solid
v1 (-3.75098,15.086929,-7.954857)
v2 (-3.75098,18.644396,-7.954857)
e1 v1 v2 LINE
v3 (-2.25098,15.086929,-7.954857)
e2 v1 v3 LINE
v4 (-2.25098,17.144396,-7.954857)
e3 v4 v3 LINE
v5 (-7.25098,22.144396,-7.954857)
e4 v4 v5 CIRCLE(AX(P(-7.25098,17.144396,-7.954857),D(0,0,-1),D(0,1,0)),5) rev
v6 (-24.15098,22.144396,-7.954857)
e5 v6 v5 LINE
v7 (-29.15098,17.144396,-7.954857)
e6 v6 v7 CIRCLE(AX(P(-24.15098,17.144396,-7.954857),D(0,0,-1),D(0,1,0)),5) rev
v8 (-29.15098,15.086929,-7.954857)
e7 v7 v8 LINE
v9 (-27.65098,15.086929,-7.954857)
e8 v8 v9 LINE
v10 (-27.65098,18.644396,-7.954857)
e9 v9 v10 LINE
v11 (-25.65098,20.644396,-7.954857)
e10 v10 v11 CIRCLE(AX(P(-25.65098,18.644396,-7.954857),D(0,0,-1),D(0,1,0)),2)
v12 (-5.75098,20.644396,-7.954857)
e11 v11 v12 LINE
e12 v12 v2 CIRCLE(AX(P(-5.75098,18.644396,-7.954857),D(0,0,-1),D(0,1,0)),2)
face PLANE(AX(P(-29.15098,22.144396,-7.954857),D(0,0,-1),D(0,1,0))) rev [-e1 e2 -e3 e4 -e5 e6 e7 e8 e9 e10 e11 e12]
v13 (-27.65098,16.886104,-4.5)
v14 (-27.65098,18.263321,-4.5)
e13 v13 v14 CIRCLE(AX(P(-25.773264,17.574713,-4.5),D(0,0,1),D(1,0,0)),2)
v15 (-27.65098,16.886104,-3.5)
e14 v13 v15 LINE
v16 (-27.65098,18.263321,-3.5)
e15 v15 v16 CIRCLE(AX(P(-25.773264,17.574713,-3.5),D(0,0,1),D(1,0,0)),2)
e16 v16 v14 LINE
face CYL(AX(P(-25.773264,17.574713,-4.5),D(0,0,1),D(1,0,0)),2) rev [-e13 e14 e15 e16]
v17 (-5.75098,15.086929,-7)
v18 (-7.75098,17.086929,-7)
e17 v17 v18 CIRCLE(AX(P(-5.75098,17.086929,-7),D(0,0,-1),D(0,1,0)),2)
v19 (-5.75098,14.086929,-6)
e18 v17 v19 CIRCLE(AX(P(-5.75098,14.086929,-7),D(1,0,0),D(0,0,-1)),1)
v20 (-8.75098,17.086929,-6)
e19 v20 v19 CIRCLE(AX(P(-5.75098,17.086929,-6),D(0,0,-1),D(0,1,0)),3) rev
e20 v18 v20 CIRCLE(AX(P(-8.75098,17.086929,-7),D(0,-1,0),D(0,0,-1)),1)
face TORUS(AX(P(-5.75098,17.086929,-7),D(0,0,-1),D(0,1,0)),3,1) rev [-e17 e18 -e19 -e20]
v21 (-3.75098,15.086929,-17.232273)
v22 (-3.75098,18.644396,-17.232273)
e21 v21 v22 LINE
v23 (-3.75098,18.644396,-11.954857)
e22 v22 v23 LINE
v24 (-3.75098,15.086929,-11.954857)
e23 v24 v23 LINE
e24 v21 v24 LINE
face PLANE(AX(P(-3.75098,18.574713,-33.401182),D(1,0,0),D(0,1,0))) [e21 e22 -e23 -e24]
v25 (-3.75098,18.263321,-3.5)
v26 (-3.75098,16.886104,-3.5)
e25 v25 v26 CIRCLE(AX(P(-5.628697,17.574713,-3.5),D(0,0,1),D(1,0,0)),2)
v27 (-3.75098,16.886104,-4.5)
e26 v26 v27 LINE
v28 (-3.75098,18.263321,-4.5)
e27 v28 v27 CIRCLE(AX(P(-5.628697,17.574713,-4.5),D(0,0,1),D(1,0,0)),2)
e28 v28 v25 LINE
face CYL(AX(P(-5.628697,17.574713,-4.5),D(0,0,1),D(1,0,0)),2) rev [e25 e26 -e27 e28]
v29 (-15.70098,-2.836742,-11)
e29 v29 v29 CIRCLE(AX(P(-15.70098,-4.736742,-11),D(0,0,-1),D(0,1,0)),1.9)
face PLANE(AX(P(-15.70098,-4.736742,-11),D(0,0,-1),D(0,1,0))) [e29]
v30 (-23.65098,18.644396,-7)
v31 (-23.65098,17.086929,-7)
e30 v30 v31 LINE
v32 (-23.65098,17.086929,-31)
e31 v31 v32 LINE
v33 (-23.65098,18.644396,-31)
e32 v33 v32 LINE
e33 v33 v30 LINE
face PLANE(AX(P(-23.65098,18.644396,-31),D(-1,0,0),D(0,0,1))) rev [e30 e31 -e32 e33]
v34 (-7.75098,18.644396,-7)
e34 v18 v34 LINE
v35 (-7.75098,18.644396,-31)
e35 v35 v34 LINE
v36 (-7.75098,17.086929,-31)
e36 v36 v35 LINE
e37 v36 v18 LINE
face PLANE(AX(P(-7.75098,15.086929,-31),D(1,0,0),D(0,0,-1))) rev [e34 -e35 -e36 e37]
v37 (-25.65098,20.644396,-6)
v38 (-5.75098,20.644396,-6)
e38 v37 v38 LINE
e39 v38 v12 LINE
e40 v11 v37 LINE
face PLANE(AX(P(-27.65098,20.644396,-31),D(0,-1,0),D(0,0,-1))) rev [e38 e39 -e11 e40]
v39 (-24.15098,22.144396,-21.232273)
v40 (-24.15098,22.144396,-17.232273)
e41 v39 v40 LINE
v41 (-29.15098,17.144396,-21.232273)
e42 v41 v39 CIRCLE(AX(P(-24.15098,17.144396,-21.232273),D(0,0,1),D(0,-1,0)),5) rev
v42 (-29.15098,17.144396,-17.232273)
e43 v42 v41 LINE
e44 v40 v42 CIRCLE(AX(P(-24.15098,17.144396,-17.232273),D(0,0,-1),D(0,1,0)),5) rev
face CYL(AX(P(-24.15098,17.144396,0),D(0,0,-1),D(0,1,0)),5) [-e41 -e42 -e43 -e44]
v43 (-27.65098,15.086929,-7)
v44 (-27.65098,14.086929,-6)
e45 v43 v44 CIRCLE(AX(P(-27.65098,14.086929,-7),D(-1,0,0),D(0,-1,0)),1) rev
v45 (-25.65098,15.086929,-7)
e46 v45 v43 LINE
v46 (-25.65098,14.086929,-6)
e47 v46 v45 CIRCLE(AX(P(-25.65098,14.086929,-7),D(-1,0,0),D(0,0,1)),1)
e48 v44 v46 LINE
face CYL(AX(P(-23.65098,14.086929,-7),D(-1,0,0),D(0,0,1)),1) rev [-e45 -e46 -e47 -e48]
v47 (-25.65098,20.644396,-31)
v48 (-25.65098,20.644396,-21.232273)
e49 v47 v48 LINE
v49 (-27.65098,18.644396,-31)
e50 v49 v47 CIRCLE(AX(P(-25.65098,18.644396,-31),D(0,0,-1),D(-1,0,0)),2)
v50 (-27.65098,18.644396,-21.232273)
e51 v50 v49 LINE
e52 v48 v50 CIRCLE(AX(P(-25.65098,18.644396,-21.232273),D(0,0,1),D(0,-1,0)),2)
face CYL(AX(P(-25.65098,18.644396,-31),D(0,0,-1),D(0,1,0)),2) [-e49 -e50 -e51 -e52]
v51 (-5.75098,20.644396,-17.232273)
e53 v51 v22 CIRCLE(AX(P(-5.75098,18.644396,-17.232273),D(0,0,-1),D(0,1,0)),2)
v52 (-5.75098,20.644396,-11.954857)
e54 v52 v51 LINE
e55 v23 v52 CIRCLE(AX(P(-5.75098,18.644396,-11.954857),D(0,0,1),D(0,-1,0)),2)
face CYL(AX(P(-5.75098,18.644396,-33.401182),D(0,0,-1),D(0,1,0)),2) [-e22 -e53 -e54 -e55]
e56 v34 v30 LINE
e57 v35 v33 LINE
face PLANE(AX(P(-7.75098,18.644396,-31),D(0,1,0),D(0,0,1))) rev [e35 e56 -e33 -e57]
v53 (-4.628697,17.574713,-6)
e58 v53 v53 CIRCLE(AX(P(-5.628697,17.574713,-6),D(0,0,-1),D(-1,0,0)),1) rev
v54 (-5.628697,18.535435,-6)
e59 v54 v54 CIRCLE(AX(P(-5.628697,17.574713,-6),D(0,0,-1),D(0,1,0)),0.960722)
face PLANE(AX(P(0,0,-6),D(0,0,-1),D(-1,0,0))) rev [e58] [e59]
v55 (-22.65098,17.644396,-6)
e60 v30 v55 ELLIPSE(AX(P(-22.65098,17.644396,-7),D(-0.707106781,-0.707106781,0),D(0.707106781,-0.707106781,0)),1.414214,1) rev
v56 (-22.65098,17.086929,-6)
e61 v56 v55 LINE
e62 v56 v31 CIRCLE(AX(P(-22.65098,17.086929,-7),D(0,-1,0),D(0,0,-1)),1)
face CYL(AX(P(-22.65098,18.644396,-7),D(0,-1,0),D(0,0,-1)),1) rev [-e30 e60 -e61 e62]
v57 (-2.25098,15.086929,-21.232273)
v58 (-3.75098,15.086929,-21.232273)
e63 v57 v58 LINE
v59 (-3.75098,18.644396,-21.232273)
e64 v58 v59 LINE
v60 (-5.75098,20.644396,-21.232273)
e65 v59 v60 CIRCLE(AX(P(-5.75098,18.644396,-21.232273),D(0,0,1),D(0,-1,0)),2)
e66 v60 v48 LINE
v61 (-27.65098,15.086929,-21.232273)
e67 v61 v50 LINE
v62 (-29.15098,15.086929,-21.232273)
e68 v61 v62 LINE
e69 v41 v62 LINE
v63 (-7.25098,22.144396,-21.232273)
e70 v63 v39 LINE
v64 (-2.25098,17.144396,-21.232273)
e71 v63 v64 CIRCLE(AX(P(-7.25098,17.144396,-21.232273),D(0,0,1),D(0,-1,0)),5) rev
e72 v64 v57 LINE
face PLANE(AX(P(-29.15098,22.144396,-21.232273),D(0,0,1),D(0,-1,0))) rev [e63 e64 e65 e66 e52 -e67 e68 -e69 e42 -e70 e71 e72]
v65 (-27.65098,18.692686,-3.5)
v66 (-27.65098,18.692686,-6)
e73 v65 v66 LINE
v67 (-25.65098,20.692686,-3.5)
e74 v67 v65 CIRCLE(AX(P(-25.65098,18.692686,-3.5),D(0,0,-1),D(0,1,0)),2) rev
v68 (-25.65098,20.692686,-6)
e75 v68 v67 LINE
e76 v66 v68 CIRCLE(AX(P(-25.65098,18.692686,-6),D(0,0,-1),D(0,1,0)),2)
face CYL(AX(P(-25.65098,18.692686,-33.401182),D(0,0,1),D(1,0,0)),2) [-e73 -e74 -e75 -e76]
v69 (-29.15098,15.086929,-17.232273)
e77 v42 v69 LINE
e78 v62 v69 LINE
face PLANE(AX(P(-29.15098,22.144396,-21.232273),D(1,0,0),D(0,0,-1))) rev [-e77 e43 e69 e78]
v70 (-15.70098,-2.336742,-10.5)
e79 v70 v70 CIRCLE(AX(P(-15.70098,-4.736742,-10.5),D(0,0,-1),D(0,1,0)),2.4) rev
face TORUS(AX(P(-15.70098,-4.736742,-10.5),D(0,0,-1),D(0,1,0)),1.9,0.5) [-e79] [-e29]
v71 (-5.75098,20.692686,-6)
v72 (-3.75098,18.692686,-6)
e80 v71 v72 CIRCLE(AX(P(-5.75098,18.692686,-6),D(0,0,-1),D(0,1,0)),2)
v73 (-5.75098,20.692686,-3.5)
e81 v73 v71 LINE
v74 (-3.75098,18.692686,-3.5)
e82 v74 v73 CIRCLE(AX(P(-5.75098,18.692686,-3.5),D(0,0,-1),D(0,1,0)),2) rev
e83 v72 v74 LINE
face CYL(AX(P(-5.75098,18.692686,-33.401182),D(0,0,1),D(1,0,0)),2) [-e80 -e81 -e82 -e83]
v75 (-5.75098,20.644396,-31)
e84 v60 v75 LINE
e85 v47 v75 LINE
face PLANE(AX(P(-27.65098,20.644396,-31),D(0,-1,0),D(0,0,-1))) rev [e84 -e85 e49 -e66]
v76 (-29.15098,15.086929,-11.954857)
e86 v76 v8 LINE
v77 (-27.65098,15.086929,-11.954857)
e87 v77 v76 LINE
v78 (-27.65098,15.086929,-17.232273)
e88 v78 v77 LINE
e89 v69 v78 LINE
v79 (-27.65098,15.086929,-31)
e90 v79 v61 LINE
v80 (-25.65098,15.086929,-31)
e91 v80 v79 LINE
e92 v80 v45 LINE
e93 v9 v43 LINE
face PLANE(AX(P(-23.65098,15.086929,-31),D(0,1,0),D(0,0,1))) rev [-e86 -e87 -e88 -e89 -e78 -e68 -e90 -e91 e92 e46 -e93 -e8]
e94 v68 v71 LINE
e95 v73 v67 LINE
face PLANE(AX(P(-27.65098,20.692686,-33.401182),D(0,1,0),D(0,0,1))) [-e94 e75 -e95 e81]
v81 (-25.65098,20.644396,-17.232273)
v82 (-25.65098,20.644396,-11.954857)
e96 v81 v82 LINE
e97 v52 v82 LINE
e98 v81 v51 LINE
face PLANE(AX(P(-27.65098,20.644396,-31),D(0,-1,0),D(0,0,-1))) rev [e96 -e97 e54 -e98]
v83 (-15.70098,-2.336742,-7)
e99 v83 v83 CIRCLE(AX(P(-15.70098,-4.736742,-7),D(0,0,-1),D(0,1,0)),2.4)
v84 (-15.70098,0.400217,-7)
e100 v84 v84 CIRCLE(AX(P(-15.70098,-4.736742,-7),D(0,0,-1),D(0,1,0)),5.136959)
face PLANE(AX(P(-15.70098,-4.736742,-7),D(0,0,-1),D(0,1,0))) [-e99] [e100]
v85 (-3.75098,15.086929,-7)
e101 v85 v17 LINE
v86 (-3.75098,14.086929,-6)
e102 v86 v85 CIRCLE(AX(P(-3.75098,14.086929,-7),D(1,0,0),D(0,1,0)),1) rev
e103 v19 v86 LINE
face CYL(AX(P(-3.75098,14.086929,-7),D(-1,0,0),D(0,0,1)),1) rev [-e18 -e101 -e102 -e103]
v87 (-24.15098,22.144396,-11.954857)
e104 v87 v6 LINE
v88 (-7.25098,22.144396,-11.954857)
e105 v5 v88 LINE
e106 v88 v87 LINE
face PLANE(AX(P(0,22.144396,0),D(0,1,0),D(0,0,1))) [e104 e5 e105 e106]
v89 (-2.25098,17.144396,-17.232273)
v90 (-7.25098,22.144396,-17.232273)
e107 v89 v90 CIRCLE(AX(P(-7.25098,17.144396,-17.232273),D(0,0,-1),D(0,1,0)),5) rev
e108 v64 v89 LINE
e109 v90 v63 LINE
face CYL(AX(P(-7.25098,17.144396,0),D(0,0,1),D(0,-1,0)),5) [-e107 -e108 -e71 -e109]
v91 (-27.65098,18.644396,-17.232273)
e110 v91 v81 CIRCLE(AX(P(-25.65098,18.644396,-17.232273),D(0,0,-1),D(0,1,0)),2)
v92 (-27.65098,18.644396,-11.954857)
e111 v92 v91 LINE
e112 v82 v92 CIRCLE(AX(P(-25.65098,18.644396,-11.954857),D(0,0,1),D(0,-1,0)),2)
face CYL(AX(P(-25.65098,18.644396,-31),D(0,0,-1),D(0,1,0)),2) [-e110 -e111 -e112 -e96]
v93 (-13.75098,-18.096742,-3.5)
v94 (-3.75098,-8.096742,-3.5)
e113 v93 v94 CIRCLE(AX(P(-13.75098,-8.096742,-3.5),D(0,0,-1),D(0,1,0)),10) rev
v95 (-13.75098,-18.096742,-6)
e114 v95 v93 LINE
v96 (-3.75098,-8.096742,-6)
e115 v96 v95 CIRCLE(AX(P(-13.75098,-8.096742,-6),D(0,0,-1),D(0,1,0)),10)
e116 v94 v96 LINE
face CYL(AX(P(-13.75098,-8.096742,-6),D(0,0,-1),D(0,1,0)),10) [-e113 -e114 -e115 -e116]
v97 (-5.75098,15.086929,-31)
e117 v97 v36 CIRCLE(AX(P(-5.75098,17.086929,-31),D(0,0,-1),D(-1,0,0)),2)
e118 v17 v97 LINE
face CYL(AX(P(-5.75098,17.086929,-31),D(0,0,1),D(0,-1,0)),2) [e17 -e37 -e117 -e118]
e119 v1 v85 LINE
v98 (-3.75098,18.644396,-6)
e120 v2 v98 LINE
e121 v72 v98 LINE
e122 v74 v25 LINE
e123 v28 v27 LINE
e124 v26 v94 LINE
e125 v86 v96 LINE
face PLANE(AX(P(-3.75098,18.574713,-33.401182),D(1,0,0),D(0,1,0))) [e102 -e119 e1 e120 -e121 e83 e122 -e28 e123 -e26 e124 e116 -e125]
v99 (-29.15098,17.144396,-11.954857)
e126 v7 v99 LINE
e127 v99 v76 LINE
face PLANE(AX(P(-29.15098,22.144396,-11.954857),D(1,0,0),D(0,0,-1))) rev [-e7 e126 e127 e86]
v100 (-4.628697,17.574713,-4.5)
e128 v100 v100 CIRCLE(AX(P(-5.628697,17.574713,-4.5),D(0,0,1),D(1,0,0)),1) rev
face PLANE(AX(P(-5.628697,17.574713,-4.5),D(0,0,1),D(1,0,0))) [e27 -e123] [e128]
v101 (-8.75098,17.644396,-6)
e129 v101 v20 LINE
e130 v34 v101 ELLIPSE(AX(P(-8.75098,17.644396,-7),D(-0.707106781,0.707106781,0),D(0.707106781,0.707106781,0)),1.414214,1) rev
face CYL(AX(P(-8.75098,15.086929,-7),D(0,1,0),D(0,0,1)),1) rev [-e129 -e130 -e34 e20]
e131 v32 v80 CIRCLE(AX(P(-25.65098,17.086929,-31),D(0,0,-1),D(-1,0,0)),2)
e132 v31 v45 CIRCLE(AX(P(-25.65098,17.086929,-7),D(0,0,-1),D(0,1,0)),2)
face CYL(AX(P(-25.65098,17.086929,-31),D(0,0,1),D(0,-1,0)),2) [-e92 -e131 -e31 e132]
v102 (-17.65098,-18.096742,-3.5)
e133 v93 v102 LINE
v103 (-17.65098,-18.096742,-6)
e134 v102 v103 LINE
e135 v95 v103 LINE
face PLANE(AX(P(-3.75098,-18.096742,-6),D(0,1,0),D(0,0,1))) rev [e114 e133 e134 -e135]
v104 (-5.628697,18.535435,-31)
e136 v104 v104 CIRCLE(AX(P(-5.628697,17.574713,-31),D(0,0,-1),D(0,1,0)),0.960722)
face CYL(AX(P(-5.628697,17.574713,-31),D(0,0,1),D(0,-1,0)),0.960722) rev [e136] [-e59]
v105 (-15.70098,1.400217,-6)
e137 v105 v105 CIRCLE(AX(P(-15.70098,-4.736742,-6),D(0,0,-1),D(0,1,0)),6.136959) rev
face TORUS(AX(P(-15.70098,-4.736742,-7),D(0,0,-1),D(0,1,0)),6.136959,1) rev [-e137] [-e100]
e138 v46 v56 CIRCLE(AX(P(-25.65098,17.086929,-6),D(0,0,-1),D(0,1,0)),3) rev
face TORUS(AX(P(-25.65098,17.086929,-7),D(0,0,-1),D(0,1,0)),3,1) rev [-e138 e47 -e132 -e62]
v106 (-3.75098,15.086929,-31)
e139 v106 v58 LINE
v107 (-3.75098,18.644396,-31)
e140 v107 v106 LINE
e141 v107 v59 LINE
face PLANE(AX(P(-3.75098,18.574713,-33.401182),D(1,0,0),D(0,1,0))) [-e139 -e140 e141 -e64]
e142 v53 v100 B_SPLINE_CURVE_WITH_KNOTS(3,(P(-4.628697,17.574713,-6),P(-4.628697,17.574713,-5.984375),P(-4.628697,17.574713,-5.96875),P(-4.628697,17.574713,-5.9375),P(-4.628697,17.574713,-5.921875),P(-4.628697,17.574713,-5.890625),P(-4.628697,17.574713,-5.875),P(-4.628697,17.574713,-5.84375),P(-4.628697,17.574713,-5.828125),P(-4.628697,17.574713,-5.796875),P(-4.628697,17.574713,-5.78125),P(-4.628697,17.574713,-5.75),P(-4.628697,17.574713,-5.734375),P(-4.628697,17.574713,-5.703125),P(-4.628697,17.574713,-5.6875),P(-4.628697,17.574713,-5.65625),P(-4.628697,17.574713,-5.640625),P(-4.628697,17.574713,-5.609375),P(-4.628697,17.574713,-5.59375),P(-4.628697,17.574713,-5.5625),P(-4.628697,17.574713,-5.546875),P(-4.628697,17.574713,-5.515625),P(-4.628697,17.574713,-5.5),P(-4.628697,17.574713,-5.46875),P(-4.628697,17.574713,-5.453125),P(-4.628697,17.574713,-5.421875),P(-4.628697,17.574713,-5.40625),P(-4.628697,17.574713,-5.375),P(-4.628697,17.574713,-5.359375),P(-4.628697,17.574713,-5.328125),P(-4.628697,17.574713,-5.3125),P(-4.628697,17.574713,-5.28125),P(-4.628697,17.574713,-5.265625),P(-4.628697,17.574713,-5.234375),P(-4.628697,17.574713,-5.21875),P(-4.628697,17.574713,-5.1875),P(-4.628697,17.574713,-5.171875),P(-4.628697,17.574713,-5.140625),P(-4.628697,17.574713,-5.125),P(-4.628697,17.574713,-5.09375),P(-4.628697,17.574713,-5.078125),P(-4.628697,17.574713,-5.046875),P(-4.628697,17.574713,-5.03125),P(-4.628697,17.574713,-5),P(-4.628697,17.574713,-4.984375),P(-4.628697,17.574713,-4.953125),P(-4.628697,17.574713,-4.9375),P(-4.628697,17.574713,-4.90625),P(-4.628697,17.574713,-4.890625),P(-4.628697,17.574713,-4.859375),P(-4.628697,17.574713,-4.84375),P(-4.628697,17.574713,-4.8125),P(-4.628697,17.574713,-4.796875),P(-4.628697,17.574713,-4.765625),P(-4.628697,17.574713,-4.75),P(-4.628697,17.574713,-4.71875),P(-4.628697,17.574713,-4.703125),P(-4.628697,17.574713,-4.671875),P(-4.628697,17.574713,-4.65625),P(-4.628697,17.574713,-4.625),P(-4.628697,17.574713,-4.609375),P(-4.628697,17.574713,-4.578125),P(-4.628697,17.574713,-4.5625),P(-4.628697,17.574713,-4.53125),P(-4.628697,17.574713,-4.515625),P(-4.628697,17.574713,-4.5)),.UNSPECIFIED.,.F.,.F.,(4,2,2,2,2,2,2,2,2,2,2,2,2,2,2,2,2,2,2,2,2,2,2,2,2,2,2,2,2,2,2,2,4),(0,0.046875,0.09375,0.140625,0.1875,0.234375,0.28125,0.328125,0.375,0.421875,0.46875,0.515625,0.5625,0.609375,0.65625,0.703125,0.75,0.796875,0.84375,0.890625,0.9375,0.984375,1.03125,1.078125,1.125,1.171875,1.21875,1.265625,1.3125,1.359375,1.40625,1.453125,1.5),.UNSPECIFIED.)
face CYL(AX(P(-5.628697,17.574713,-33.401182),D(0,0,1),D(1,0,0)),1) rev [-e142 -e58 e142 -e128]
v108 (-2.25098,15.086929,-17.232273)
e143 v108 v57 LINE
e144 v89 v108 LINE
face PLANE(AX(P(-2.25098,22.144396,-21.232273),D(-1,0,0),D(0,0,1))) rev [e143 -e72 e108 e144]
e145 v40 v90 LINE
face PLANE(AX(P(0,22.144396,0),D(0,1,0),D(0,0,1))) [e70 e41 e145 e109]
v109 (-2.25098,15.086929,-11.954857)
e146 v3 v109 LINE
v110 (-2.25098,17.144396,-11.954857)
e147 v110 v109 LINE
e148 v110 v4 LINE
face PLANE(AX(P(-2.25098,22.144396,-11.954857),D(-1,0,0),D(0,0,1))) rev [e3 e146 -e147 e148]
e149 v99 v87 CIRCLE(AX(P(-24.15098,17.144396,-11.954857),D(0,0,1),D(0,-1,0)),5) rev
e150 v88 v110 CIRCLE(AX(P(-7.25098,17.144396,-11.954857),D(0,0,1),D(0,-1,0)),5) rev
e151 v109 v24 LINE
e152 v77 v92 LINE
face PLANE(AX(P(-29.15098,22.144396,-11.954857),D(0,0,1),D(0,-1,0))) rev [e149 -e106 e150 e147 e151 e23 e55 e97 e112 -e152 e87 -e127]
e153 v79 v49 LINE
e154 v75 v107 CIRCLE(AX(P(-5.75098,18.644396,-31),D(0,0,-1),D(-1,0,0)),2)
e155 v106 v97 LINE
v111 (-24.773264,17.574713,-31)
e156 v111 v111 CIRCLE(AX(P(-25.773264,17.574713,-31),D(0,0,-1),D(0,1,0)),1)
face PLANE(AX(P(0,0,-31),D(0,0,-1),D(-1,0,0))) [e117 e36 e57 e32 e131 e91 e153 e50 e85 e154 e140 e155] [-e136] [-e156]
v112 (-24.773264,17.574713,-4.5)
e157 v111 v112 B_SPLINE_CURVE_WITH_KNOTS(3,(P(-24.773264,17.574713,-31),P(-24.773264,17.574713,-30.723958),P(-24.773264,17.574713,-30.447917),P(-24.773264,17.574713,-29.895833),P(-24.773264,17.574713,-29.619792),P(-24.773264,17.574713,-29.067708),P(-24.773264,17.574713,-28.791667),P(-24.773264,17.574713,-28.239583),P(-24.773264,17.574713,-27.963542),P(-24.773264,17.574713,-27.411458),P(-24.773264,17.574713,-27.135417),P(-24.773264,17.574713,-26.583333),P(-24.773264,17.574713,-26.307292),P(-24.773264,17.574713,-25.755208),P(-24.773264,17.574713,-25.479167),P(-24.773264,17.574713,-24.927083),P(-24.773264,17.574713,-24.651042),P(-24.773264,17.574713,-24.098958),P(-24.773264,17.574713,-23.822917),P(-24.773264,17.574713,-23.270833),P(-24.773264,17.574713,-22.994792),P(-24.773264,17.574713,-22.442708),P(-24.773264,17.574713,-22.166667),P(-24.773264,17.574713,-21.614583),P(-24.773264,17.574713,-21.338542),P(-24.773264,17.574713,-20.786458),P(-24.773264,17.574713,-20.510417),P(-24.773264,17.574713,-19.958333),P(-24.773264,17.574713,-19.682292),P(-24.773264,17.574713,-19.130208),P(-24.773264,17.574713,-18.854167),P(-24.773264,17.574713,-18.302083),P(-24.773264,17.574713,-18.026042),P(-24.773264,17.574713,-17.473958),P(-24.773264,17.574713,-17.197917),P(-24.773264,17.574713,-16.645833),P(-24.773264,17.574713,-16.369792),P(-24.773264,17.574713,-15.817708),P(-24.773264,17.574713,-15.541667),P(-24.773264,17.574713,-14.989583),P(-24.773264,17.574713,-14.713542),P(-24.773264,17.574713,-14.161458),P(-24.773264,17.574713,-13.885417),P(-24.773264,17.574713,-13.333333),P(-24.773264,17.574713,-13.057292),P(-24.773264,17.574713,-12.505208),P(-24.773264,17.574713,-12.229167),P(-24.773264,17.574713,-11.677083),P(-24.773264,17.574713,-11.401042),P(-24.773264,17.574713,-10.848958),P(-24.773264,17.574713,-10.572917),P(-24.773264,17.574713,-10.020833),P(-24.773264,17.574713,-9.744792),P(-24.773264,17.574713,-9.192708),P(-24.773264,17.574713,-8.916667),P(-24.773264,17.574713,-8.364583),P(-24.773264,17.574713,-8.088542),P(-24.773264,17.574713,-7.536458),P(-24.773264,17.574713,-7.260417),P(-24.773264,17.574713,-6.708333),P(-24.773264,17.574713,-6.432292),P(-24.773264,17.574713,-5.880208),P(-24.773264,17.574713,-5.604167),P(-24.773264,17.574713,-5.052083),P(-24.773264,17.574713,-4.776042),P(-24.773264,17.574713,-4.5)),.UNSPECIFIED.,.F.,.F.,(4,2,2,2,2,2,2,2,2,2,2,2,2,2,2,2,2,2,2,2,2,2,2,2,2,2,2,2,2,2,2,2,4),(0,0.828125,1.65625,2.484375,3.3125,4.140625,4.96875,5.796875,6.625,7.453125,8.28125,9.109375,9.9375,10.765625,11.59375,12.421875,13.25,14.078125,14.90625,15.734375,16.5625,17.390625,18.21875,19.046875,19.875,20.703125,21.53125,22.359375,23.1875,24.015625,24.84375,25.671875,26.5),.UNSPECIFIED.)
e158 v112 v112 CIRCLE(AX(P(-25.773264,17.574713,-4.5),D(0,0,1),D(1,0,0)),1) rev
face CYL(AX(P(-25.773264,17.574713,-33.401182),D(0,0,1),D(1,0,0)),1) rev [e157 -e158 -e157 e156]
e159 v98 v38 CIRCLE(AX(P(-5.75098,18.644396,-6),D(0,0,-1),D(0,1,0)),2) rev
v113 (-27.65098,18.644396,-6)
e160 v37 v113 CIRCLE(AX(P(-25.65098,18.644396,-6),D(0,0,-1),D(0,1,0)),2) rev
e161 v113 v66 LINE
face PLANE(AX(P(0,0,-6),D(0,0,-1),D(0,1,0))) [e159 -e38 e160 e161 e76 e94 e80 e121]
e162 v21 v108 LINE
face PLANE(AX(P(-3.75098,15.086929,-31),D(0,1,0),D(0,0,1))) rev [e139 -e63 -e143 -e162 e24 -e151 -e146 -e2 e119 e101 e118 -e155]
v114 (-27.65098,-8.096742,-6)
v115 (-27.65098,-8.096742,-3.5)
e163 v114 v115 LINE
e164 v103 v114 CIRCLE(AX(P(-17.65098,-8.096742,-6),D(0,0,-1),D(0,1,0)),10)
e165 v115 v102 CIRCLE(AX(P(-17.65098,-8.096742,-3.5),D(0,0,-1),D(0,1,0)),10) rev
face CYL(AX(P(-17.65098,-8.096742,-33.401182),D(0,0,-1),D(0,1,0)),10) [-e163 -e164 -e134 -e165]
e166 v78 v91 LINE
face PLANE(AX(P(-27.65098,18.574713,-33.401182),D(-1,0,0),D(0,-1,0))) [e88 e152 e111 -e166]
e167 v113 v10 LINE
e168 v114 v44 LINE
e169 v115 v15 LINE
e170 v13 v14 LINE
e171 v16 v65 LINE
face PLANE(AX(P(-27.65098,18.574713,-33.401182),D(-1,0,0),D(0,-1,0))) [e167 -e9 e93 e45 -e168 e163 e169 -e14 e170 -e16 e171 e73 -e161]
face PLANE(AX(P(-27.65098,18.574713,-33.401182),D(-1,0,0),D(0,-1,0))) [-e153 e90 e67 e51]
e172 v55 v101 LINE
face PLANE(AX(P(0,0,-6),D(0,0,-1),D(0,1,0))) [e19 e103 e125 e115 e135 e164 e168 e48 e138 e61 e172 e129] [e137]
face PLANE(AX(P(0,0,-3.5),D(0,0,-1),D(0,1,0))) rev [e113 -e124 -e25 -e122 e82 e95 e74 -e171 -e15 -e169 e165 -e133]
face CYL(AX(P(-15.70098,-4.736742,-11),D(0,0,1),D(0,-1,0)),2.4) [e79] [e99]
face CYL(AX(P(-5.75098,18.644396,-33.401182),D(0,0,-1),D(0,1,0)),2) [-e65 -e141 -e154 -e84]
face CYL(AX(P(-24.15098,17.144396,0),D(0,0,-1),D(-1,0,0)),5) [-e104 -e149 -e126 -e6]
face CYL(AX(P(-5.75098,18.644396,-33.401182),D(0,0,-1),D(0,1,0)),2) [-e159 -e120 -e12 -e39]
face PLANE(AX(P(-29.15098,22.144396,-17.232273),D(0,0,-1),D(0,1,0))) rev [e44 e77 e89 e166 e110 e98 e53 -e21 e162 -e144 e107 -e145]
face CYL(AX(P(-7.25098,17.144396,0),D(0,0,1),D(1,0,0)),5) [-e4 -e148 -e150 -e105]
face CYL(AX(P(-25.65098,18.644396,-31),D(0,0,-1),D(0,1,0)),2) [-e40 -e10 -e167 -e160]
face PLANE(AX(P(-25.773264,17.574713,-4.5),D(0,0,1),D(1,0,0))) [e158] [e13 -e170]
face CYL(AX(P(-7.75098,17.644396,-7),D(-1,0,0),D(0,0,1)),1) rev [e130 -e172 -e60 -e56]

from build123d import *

# Parameters (mm, degrees)
SKETCH_1_W                = 32.6
SKETCH_1_H                = 34.6
SKETCH_1_R                = 1.25
SKETCH_1_W_2              = 24.6
SKETCH_1_H_2              = 24.2
EXTRUDE_1_DEPTH           = 13
SKETCH_3_W                = 6.5
SKETCH_3_H                = 6.519005167
CUT_EXTRUDE_1_DEPTH       = 19
SKETCH_4_W                = 6.5
SKETCH_4_H                = 6.467668889
CUT_EXTRUDE_2_DEPTH       = 23
EXTRUDE_2_DEPTH           = 50
SKETCH_1_2_W              = 22.27659965
SKETCH_1_2_H              = 4.598586669
SKETCH_1_2_W_2            = 22.283050596
SKETCH_1_2_H_2            = 4.977540741
CUT_EXTRUDE_5_DEPTH       = 34
FILLET_1_R                = 2
FILLET_2_R                = 2
SKETCH_9_W                = 54.594998093
SKETCH_9_H                = 18.111982385
SKETCH_9_W_2              = 52.534809486
SKETCH_9_H_2              = 12.989301534
CUT_EXTRUDE_6_DEPTH       = 41
FILLET_6_R                = 22
EXTRUDE_4_DEPTH           = 13
SKETCH_13_W               = 5.518907879
SKETCH_13_H               = 8.361822047
CUT_EXTRUDE_8_DEPTH       = 8.5
SKETCH_14_W               = 6.038657432
SKETCH_14_H               = 7.741248121
CUT_EXTRUDE_9_DEPTH       = 8.5
SKETCH_23_OUTSIDE_W       = 35.102
SKETCH_23_OUTSIDE_H       = 56.702
SKETCH_23_OUTSIDE_W_2     = 1.5
SKETCH_23_OUTSIDE_H_2     = 34.6
CUT_EXTRUDE_10_DEPTH      = 104
SKETCH_24_W               = 10.341780897
SKETCH_24_H               = 5.2
SKETCH_24_R               = 1.25
EXTRUDE_5_DEPTH           = 1.5
SKETCH_25_R               = 1.25
CUT_EXTRUDE_11_DEPTH      = 104
SKETCH_26_OUTSIDE_W       = 115.402
SKETCH_26_OUTSIDE_H       = 56.536
SKETCH_26_OUTSIDE_W_2     = 17.268409177
SKETCH_26_OUTSIDE_H_2     = 34.6
CUT_EXTRUDE_12_DEPTH      = 10
SKETCH_27_W               = 2.368409177
SKETCH_27_H               = 25.781356428
EXTRUDE_6_DEPTH           = 1.5
SKETCH_28_R               = 1.25
CUT_EXTRUDE_13_DEPTH      = 10
CUT_EXTRUDE_START         = -1.5
CUT_EXTRUDE_14_OUTLINE_W  = 0.368409177
CUT_EXTRUDE_14_OUTLINE_H  = 34.6
CUT_EXTRUDE_14_DEPTH      = 1.5
SKETCH_30_R               = 1
SKETCH_30_W               = 15.411127821
SKETCH_30_H               = 34.6
EXTRUDE_7_DEPTH           = 1.5
SKETCH_33_W               = 23.9
SKETCH_33_H               = 38.011921137
SKETCH_33_R               = 1.25
SKETCH_33_R_2             = 1
EXTRUDE_8_DEPTH           = 15
SKETCH_34_OUTSIDE_W       = 35.468
SKETCH_34_OUTSIDE_H       = 49.58
SKETCH_34_OUTSIDE_W_2     = 15.945908464
SKETCH_34_OUTSIDE_H_2     = 43.183358486
CUT_EXTRUDE_15_DEPTH      = 13.5
SKETCH_35_W               = 12.9
SKETCH_35_H               = 31.784162084
CUT_EXTRUDE_16_DEPTH      = 9.5
SKETCH_37_R               = 2.45
EXTRUDE_9_DEPTH           = 6.5
SKETCH_39_W               = 13.171271293
SKETCH_39_H               = 32.937459588
CUT_EXTRUDE_17_DEPTH      = 3
SKETCH_40_R               = 1
EXTRUDE_10_DEPTH          = 2.5
CUT_EXTRUDE_18_DEPTH      = 39.46624694
CUT_EXTRUDE_18_DEPTH_BACK = 39.46624694
SKETCH_41_W               = 23.981836835
SKETCH_41_H               = 47.1912102
SKETCH_42_R               = 2.4
EXTRUDE_11_DEPTH          = 5
FILLET_7_R                = 10
SKETCH_43_R               = 0.960722285
SKETCH_43_R_2             = 1
EXTRUDE_12_DEPTH          = 25
FILLET_9_R                = 2
SKETCH_44_R               = 2
CUT_EXTRUDE_19_DEPTH      = 1
SKETCH_45_W               = 26.9
SKETCH_45_H               = 4
EXTRUDE_13_DEPTH          = 1.5
SKETCH_46_W               = 1.5
SKETCH_46_H               = 4
EXTRUDE_14_DEPTH          = 5.557466787
FILLET_11_R               = 5
FILLET_14_R               = 1
FILLET_15_R               = 2
FILLET_16_R               = 2
FILLET_17_R               = 2
FILLET_18_R               = 2
FILLET_19_R               = 2
FILLET_20_R               = 2
FILLET_21_R               = 2
FILLET_22_R               = 2
SKETCH_47_R               = 5.136959448
EXTRUDE_15_DEPTH          = 1
FILLET_23_R               = 1
FILLET_24_R               = 0.5


# Read off the part's stored shape, not the designer's step: 切除-拉伸14
# Some blends are built 0.0001 mm under size
with BuildPart() as part:
    # Sketch 1 → 凸台-拉伸1 (new body)
    with BuildSketch(Plane.XY):
        with Locations((-9.850980392, 1.274712581)):
            Rectangle(SKETCH_1_W, SKETCH_1_H)
        with Locations(Location((-15.700980392, 15.424712581, 0), (0, 0, 180))):
            Circle(SKETCH_1_R, mode=Mode.SUBTRACT)
        with Locations(Location((-3.600980392, 15.424712581, 0), (0, 0, 180))):
            Circle(SKETCH_1_R, mode=Mode.SUBTRACT)
        with Locations(Location((-15.700980392, -12.875287419, 0), (0, 0, 180))):
            Circle(SKETCH_1_R, mode=Mode.SUBTRACT)
        with Locations(Location((-3.600980392, -12.875287419, 0), (0, 0, 180))):
            Circle(SKETCH_1_R, mode=Mode.SUBTRACT)
        with Locations((-9.850980392, 1.274712581)):
            Rectangle(SKETCH_1_W_2, SKETCH_1_H_2, mode=Mode.SUBTRACT)
    extrude(amount=EXTRUDE_1_DEPTH)

    # 草图3 → 切除-拉伸1 (cut)
    with BuildSketch(Plane(origin=(0, 0, 0), x_dir=(-1, 0, 0), z_dir=(0, 0, -1))):
        with Locations((15.700980392, -10.82528742)):
            Rectangle(SKETCH_3_W, SKETCH_3_H)
    extrude(amount=-CUT_EXTRUDE_1_DEPTH, mode=Mode.SUBTRACT)

    # 草图4 → 切除-拉伸2 (cut)
    with BuildSketch(Plane.XY.offset(13)):
        with Locations((-3.600980392, -10.82528742)):
            Rectangle(SKETCH_4_W, SKETCH_4_H)
    extrude(amount=-CUT_EXTRUDE_2_DEPTH, mode=Mode.SUBTRACT)

    # 草图5 → 凸台-拉伸2 (add)
    with BuildSketch(Plane(origin=(6.449019608, 0, 0), x_dir=(0, 0, -1), z_dir=(1, 0, 0))):
        Polygon((-13, 18.574712581), (-13, 10.055461473), (-13, -16.025287419), (0, -16.025287419), (0, -15.027567927), (0, 16.282461831), (0, 18.574712581), align=None)
    extrude(amount=EXTRUDE_2_DEPTH)

    # Sketch 1 2 → 切除-拉伸5 (cut)
    with BuildSketch(Plane.XY.offset(13)):
        with Locations((24.037173058, -7.263594431)):
            Rectangle(SKETCH_1_2_W, SKETCH_1_2_H)
        with Locations((24.078382453, 0.81654228)):
            Rectangle(SKETCH_1_2_W_2, SKETCH_1_2_H_2)
    extrude(amount=-CUT_EXTRUDE_5_DEPTH, mode=Mode.SUBTRACT)

    # 圆角1
    fillet_1_edges = [part.edges().sort_by_distance(p)[0] for p in [
        (12.936857155, -1.672228091, 6.5),
        (12.936857155, 3.30531265, 6.5),
        (35.219907751, 3.30531265, 6.5),
        (35.219907751, -1.672228091, 6.5),
        (12.898873233, -9.562887765, 6.5),
        (12.898873233, -4.964301096, 6.5),
        (35.175472883, -4.964301096, 6.5),
        (35.175472883, -9.562887765, 6.5),
    ]]
    fillet(fillet_1_edges, radius=FILLET_1_R)

    # 圆角2
    fillet_2_edges = [part.edges().sort_by_distance(p)[0] for p in [
        (-26.150980392, -16.025287419, 6.5),
        (-26.150980392, 18.574712581, 6.5),
    ]]
    fillet(fillet_2_edges, radius=FILLET_2_R)

    # 草图9 → 切除-拉伸6 (cut)
    with BuildSketch(Plane(origin=(0, 0, 0), x_dir=(-1, 0, 0), z_dir=(0, 0, -1))):
        with Locations((-36.934177516, 16.051357777)):
            Rectangle(SKETCH_9_W, SKETCH_9_H)
        with Locations((-36.653242706, -19.247200889)):
            Rectangle(SKETCH_9_W_2, SKETCH_9_H_2)
    extrude(amount=-CUT_EXTRUDE_6_DEPTH, mode=Mode.SUBTRACT)

    # 圆角6
    # the kernel refuses this fillet: 22 mm, written as the material it adds along each edge
    with BuildSketch(Plane(origin=(9.636678469, 6.995366584, 0), x_dir=(0, 1, 0), z_dir=(0, 0, 1))) as fillet_6_piece_1:
        with BuildLine():
            CenterArc((22, -19.375499223), FILLET_6_R, 118.272534833, 61.727465167)
            Line((0, -19.375499223), (-0.44, -19.375499223))
            Line((-0.44, -19.375499223), (-0.44, 0))
            Line((-0.44, 0), (0, 0.44))
            ThreePointArc((0, 0.44), (5.789672998, 0.44), (11.370932916, 0.387509984))
            Line((11.370932916, 0.387509984), (11.579345996, 0))
        make_face()
    extrude(amount=13)
    with BuildSketch(Plane(origin=(10.385837963, -12.752550122, 0), x_dir=(1, 0, 0), z_dir=(0, 0, 1))) as fillet_6_piece_2:
        with BuildLine():
            CenterArc((11.54511289, -22), FILLET_6_R, 90, 31.653290012)
            Line((0, -3.272737297), (-0.230902258, -2.898192043))
            ThreePointArc((-0.230902258, -2.898192043), (-0.44, -1.636368649), (-0.44, 0))
            Line((-0.44, 0), (0, 0.44))
            Line((0, 0.44), (11.54511289, 0.44))
            Line((11.54511289, 0.44), (11.54511289, 0))
        make_face()
    extrude(amount=13)

    # 草图12 → 凸台-拉伸4 (add)
    with BuildSketch(Plane(origin=(0, 0, 0), x_dir=(-1, 0, 0), z_dir=(0, 0, -1))):
        with BuildLine():
            Line((24.150980392, 18.574712581), (24.496655084, -15.99518818))
            ThreePointArc((24.496655084, -15.99518818), (37.015647173, 1.416671567), (24.150980392, 18.574712581))
        make_face()
        with BuildLine():
            Line((26.822698684, 1.289948959), (26.822698684, -8.431688638))
            ThreePointArc((26.822698684, -8.431688638), (32.027920461, 1.289948959), (26.822698684, 11.011586556))
            Line((26.822698684, 11.011586556), (26.822698684, 1.289948959))
        make_face(mode=Mode.SUBTRACT)
    extrude(amount=-EXTRUDE_4_DEPTH)

    # 草图13 → 切除-拉伸8 (cut)
    with BuildSketch(Plane.XY.offset(13)):
        with Locations((-3.600980393, 15.424712581)):
            Rectangle(SKETCH_13_W, SKETCH_13_H)
    extrude(amount=-CUT_EXTRUDE_8_DEPTH, mode=Mode.SUBTRACT)

    # 草图14 → 切除-拉伸9 (cut)
    with BuildSketch(Plane(origin=(0, 0, 0), x_dir=(-1, 0, 0), z_dir=(0, 0, -1))):
        with Locations((15.700980392, 15.424712581)):
            Rectangle(SKETCH_14_W, SKETCH_14_H)
    extrude(amount=-CUT_EXTRUDE_9_DEPTH, mode=Mode.SUBTRACT)

    # 草图23 outside → 切除-拉伸10 (cut)
    with BuildSketch(Plane(origin=(56.449019608, 0, 0), x_dir=(0, 0, -1), z_dir=(1, 0, 0))):
        with Locations((-6.5, 1.275)):
            Rectangle(SKETCH_23_OUTSIDE_W, SKETCH_23_OUTSIDE_H)
        with Locations((-12.25, 1.274712581)):
            Rectangle(SKETCH_23_OUTSIDE_W_2, SKETCH_23_OUTSIDE_H_2, mode=Mode.SUBTRACT)
    extrude(amount=-CUT_EXTRUDE_10_DEPTH, mode=Mode.SUBTRACT)

    # 草图24 → 凸台-拉伸5 (add)
    with BuildSketch(Plane.XY.offset(13)):
        with Locations((-4.17557206, 15.974712581)):
            Rectangle(SKETCH_24_W, SKETCH_24_H)
        with Locations((-3.600980392, 15.429779286)):
            Circle(SKETCH_24_R, mode=Mode.SUBTRACT)
    extrude(amount=-EXTRUDE_5_DEPTH)

    # 草图25 → 切除-拉伸11 (cut)
    with BuildSketch(Plane.XY.offset(13)):
        with Locations((42.624971711, -3.793205976)):
            Circle(SKETCH_25_R)
        with Locations((-34.434765713, 1.289948959)):
            Circle(SKETCH_25_R)
        with Locations((-25.484048207, 14.316394652)):
            Circle(SKETCH_25_R)
        with Locations((-25.484048207, -12.050711449)):
            Circle(SKETCH_25_R)
    extrude(amount=-CUT_EXTRUDE_11_DEPTH, mode=Mode.SUBTRACT)

    # 草图26 outside → 切除-拉伸12 (cut)
    with BuildSketch(Plane.XY.offset(13)):
        with Locations((9.716, 1.275)):
            Rectangle(SKETCH_26_OUTSIDE_W, SKETCH_26_OUTSIDE_H)
        with Locations((-15.516775803, 1.274712581)):
            Rectangle(SKETCH_26_OUTSIDE_W_2, SKETCH_26_OUTSIDE_H_2, mode=Mode.SUBTRACT)
    extrude(amount=-CUT_EXTRUDE_12_DEPTH, mode=Mode.SUBTRACT)

    # 草图27 → 凸台-拉伸6 (add)
    with BuildSketch(Plane.XY.offset(13)):
        with Locations((-8.066775804, 0.484034367)):
            Rectangle(SKETCH_27_W, SKETCH_27_H)
    extrude(amount=-EXTRUDE_6_DEPTH)

    # 草图28 → 切除-拉伸13 (cut)
    with BuildSketch(Plane.XY.offset(13)):
        with Locations((-19.200980392, 15.384992379)):
            Circle(SKETCH_28_R)
        with Locations((-12.200980392, 15.384992379)):
            Circle(SKETCH_28_R)
    extrude(amount=-CUT_EXTRUDE_13_DEPTH, mode=Mode.SUBTRACT)

    # 切除-拉伸14 outline → 切除-拉伸14 (cut)
    with BuildSketch(Plane.XY.offset(13).offset(CUT_EXTRUDE_START)):
        with Locations((-7.066775804, 1.274712581)):
            Rectangle(CUT_EXTRUDE_14_OUTLINE_W, CUT_EXTRUDE_14_OUTLINE_H)
    extrude(amount=CUT_EXTRUDE_14_DEPTH, mode=Mode.SUBTRACT)

    # 草图30 → 凸台-拉伸7 (add)
    with BuildSketch(Plane.XY.offset(13)):
        Polygon((-27.650980392, 18.574712581), (-27.650980392, -16.025287419), (-27.650980392, -17.319235473), (-3.750980392, -17.319235473), (-3.750980392, -16.025287419), (-3.750980392, 18.574712581), (-3.750980392, 20.692685664), (-27.650980392, 20.692685664), align=None)
        with Locations((-25.773264037, 17.574712581)):
            Circle(SKETCH_30_R, mode=Mode.SUBTRACT)
        with Locations((-5.628696747, 17.574712581)):
            Circle(SKETCH_30_R, mode=Mode.SUBTRACT)
        with Locations((-15.213421192, 1.274712581)):
            Rectangle(SKETCH_30_W, SKETCH_30_H, mode=Mode.SUBTRACT)
    extrude(amount=-EXTRUDE_7_DEPTH)

    # 草图33 → 凸台-拉伸8 (add)
    with BuildSketch(Plane(origin=(0, 0, 11.5), x_dir=(-1, 0, 0), z_dir=(0, 0, -1))):
        with Locations((15.700980392, 1.686725095)):
            Rectangle(SKETCH_33_W, SKETCH_33_H)
        with Locations((15.700980392, 15.424712581)):
            Circle(SKETCH_33_R, mode=Mode.SUBTRACT)
        with Locations(Location((12.200980392, 15.384992379, 0), (0, 0, 180))):
            Circle(SKETCH_33_R, mode=Mode.SUBTRACT)
        with Locations(Location((19.200980392, 15.384992379, 0), (0, 0, 180))):
            Circle(SKETCH_33_R, mode=Mode.SUBTRACT)
        with Locations(Location((25.773264037, 17.574712581, 0), (0, 0, 180))):
            Circle(SKETCH_33_R_2, mode=Mode.SUBTRACT)
        with Locations(Location((5.628696747, 17.574712581, 0), (0, 0, 180))):
            Circle(SKETCH_33_R_2, mode=Mode.SUBTRACT)
        with BuildLine():
            Line((9.250980392, -10.825287419), (12.450980392, -10.825287419))
            Line((12.450980392, -10.825287419), (12.450980392, -14.084790003))
            Line((12.450980392, -14.084790003), (15.385380168, -14.084790003))
            ThreePointArc((15.385380168, -14.084790003), (15.700980392, -14.125287419), (16.016580616, -14.084790003))
            Line((16.016580616, -14.084790003), (18.950980392, -14.084790003))
            Line((18.950980392, -14.084790003), (18.950980392, -10.825287419))
            Line((18.950980392, -10.825287419), (22.150980392, -10.825287419))
            Line((22.150980392, -10.825287419), (22.150980392, 13.374712581))
            Line((22.150980392, 13.374712581), (9.250980392, 13.374712581))
            Line((9.250980392, 13.374712581), (9.250980392, -10.825287419))
        make_face(mode=Mode.SUBTRACT)
    extrude(amount=EXTRUDE_8_DEPTH)

    # 草图34 outside → 切除-拉伸15 (cut)
    with BuildSketch(Plane.XY.offset(13)):
        with Locations((-15.701, 1.687)):
            Rectangle(SKETCH_34_OUTSIDE_W, SKETCH_34_OUTSIDE_H)
        with Locations((-15.700980392, 2.766642636)):
            Rectangle(SKETCH_34_OUTSIDE_W_2, SKETCH_34_OUTSIDE_H_2, mode=Mode.SUBTRACT)
    extrude(amount=-CUT_EXTRUDE_15_DEPTH, mode=Mode.SUBTRACT)

    # 草图35 → 切除-拉伸16 (cut)
    with BuildSketch(Plane.XY.offset(13)):
        with Locations((-15.700980392, 1.798395824)):
            Rectangle(SKETCH_35_W, SKETCH_35_H)
    extrude(amount=-CUT_EXTRUDE_16_DEPTH, mode=Mode.SUBTRACT)

    # 草图37 → 凸台-拉伸9 (add)
    with BuildSketch(Plane(origin=(0, 20.692685664, 0), x_dir=(1, 0, 0), z_dir=(0, 1, 0))):
        with Locations(Location((-15.700980392, -6.5, 0), (0, 0, 270))):
            Circle(SKETCH_37_R)
    extrude(amount=EXTRUDE_9_DEPTH)

    # 草图39 → 切除-拉伸17 (cut)
    with BuildSketch(Plane(origin=(0, 0, -3.5), x_dir=(-1, 0, 0), z_dir=(0, 0, -1))):
        with Locations((15.689641538, 1.922980187)):
            Rectangle(SKETCH_39_W, SKETCH_39_H)
    extrude(amount=-CUT_EXTRUDE_17_DEPTH, mode=Mode.SUBTRACT)

    # 草图40 → 凸台-拉伸10 (add)
    with BuildSketch(Plane(origin=(0, 0, -3.5), x_dir=(-1, 0, 0), z_dir=(0, 0, -1))):
        Polygon((3.750980392, 6.486167428), (3.750980392, -18.096742267), (27.650980392, -18.096742267), (27.650980392, 6.486167428), (27.650980392, 20.692685664), (3.750980392, 20.692685664), align=None)
        with Locations(Location((5.628696747, 17.574712581, 0), (0, 0, 180))):
            Circle(SKETCH_40_R, mode=Mode.SUBTRACT)
        with Locations(Location((25.773264037, 17.574712581, 0), (0, 0, 180))):
            Circle(SKETCH_40_R, mode=Mode.SUBTRACT)
    extrude(amount=EXTRUDE_10_DEPTH)

    # 草图41 → 切除-拉伸18 (cut, two sides: drawn at the far end of the back side and taken through both)
    with BuildSketch(Plane.ZY.offset(27.650980392).offset(-CUT_EXTRUDE_18_DEPTH_BACK)):
        with Locations((8.490918418, 6.276369627)):
            Rectangle(SKETCH_41_W, SKETCH_41_H)
    extrude(amount=CUT_EXTRUDE_18_DEPTH + CUT_EXTRUDE_18_DEPTH_BACK, mode=Mode.SUBTRACT)

    # 草图42 → 凸台-拉伸11 (add)
    with BuildSketch(Plane(origin=(0, 0, -6), x_dir=(-1, 0, 0), z_dir=(0, 0, -1))):
        with Locations(Location((15.700980392, -4.736742267, 0), (0, 0, 90))):
            Circle(SKETCH_42_R)
    extrude(amount=EXTRUDE_11_DEPTH)

    # 圆角7
    fillet_7_edges = [part.edges().sort_by_distance(p)[0] for p in [
        (-27.650980392, -18.096742267, -4.75),
        (-3.750980392, -18.096742267, -4.75),
    ]]
    fillet(fillet_7_edges, radius=FILLET_7_R)

    # 草图43 → 凸台-拉伸12 (add)
    with BuildSketch(Plane(origin=(0, 0, -6), x_dir=(-1, 0, 0), z_dir=(0, 0, -1))):
        Polygon((3.750980392, 15.086929107), (7.750980392, 15.086929107), (7.750980392, 18.644395894), (23.650980392, 18.644395894), (23.650980392, 15.086929107), (27.650980392, 15.086929107), (27.650980392, 20.644395894), (3.750980392, 20.644395894), align=None)
        with Locations(Location((5.628696747, 17.574712581, 0), (0, 0, 90))):
            Circle(SKETCH_43_R, mode=Mode.SUBTRACT)
        with Locations(Location((25.773264037, 17.574712581, 0), (0, 0, 180))):
            Circle(SKETCH_43_R_2, mode=Mode.SUBTRACT)
    extrude(amount=EXTRUDE_12_DEPTH)

    # 圆角9
    fillet_9_edges = [part.edges().sort_by_distance(p)[0] for p in [
        (-7.750980392, 15.086929107, -18.5),
        (-23.650980392, 15.086929107, -18.5),
    ]]
    fillet(fillet_9_edges, radius=FILLET_9_R)

    # 草图44 → 切除-拉伸19 (cut)
    with BuildSketch(Plane.XY.offset(-3.5)):
        with Locations((-5.628696747, 17.574712581)):
            Circle(SKETCH_44_R)
        with Locations((-25.773264037, 17.574712581)):
            Circle(SKETCH_44_R)
    extrude(amount=-CUT_EXTRUDE_19_DEPTH, mode=Mode.SUBTRACT)

    # 草图45 → 凸台-拉伸13 (add)
    with BuildSketch(Plane(origin=(0, 20.644395894, 0), x_dir=(1, 0, 0), z_dir=(0, 1, 0))):
        with Locations((-15.700980392, 19.232273158)):
            Rectangle(SKETCH_45_W, SKETCH_45_H)
        with Locations((-15.700980392, 9.954857037)):
            Rectangle(SKETCH_45_W, SKETCH_45_H)
    extrude(amount=EXTRUDE_13_DEPTH)

    # 草图46 → 凸台-拉伸14 (add)
    with BuildSketch(Plane.XZ.offset(-20.644395894)):
        with Locations((-3.000980392, -9.954857037)):
            Rectangle(SKETCH_46_W, SKETCH_46_H)
        with Locations((-3.000980392, -19.232273158)):
            Rectangle(SKETCH_46_W, SKETCH_46_H)
        with Locations((-28.400980392, -19.232273158)):
            Rectangle(SKETCH_46_W, SKETCH_46_H)
        with Locations((-28.400980392, -9.954857037)):
            Rectangle(SKETCH_46_W, SKETCH_46_H)
    extrude(amount=EXTRUDE_14_DEPTH)

    # 圆角11
    fillet_11_edges = [part.edges().sort_by_distance(p)[0] for p in [
        (-29.150980392, 22.144395894, -19.232273158),
        (-2.250980392, 22.144395894, -19.232273158),
        (-29.150980392, 22.144395894, -9.954857037),
        (-2.250980392, 22.144395894, -9.954857037),
    ]]
    fillet(fillet_11_edges, radius=FILLET_11_R)

    # 圆角14
    fillet_14_edges = [part.edges().sort_by_distance(p)[0] for p in [
        (-7.750980392, 17.865662501, -6),
        (-26.650980392, 15.086929107, -6),
        (-7.165193955, 15.672715545, -6),
        (-24.23676683, 15.672715545, -6),
        (-4.750980392, 15.086929107, -6),
        (-15.700980392, 18.644395894, -6),
        (-23.650980392, 17.865662501, -6),
    ]]
    fillet(fillet_14_edges, radius=FILLET_14_R)

    # 圆角15
    fillet_15_edges = [part.edges().sort_by_distance(p)[0] for p in [
        (-27.650980392, 20.644395894, -6.977428519),
    ]]
    fillet(fillet_15_edges, radius=FILLET_15_R)

    # 圆角16
    fillet_16_edges = [part.edges().sort_by_distance(p)[0] for p in [
        (-27.650980392, 20.692685664, -4.75),
    ]]
    fillet(fillet_16_edges, radius=FILLET_16_R)

    # 圆角17
    fillet_17_edges = [part.edges().sort_by_distance(p)[0] for p in [
        (-27.650980392, 20.644395894, -14.593565098),
    ]]
    fillet(fillet_17_edges, radius=FILLET_17_R)

    # 圆角18
    fillet_18_edges = [part.edges().sort_by_distance(p)[0] for p in [
        (-27.650980392, 20.644395894, -26.116136579),
    ]]
    fillet(fillet_18_edges, radius=FILLET_18_R)

    # 圆角19
    fillet_19_edges = [part.edges().sort_by_distance(p)[0] for p in [
        (-3.750980392, 20.644395894, -26.116136579),
    ]]
    fillet(fillet_19_edges, radius=FILLET_19_R)

    # 圆角20
    fillet_20_edges = [part.edges().sort_by_distance(p)[0] for p in [
        (-3.750980392, 20.644395894, -14.593565098),
    ]]
    fillet(fillet_20_edges, radius=FILLET_20_R)

    # 圆角21
    fillet_21_edges = [part.edges().sort_by_distance(p)[0] for p in [
        (-3.750980392, 20.644395894, -6.977428519),
    ]]
    fillet(fillet_21_edges, radius=FILLET_21_R)

    # 圆角22
    fillet_22_edges = [part.edges().sort_by_distance(p)[0] for p in [
        (-3.750980392, 20.692685664, -4.75),
    ]]
    fillet(fillet_22_edges, radius=FILLET_22_R)

    # 草图47 → 凸台-拉伸15 (add)
    with BuildSketch(Plane(origin=(0, 0, -6), x_dir=(-1, 0, 0), z_dir=(0, 0, -1))):
        with Locations(Location((15.700980392, -4.736742267, 0), (0, 0, 90))):
            Circle(SKETCH_47_R)
    extrude(amount=EXTRUDE_15_DEPTH)

    # 圆角23
    fillet_23_edges = [part.edges().sort_by_distance(p)[0] for p in [
        (-15.700980392, -9.873701716, -6),
    ]]
    fillet(fillet_23_edges, radius=FILLET_23_R - 0.0001)  # a hair under: the kernel refuses the full size

    # 圆角24
    fillet_24_edges = [part.edges().sort_by_distance(p)[0] for p in [
        (-15.700980392, -7.136742267, -11),
    ]]
    fillet(fillet_24_edges, radius=FILLET_24_R)


solid = part.part
